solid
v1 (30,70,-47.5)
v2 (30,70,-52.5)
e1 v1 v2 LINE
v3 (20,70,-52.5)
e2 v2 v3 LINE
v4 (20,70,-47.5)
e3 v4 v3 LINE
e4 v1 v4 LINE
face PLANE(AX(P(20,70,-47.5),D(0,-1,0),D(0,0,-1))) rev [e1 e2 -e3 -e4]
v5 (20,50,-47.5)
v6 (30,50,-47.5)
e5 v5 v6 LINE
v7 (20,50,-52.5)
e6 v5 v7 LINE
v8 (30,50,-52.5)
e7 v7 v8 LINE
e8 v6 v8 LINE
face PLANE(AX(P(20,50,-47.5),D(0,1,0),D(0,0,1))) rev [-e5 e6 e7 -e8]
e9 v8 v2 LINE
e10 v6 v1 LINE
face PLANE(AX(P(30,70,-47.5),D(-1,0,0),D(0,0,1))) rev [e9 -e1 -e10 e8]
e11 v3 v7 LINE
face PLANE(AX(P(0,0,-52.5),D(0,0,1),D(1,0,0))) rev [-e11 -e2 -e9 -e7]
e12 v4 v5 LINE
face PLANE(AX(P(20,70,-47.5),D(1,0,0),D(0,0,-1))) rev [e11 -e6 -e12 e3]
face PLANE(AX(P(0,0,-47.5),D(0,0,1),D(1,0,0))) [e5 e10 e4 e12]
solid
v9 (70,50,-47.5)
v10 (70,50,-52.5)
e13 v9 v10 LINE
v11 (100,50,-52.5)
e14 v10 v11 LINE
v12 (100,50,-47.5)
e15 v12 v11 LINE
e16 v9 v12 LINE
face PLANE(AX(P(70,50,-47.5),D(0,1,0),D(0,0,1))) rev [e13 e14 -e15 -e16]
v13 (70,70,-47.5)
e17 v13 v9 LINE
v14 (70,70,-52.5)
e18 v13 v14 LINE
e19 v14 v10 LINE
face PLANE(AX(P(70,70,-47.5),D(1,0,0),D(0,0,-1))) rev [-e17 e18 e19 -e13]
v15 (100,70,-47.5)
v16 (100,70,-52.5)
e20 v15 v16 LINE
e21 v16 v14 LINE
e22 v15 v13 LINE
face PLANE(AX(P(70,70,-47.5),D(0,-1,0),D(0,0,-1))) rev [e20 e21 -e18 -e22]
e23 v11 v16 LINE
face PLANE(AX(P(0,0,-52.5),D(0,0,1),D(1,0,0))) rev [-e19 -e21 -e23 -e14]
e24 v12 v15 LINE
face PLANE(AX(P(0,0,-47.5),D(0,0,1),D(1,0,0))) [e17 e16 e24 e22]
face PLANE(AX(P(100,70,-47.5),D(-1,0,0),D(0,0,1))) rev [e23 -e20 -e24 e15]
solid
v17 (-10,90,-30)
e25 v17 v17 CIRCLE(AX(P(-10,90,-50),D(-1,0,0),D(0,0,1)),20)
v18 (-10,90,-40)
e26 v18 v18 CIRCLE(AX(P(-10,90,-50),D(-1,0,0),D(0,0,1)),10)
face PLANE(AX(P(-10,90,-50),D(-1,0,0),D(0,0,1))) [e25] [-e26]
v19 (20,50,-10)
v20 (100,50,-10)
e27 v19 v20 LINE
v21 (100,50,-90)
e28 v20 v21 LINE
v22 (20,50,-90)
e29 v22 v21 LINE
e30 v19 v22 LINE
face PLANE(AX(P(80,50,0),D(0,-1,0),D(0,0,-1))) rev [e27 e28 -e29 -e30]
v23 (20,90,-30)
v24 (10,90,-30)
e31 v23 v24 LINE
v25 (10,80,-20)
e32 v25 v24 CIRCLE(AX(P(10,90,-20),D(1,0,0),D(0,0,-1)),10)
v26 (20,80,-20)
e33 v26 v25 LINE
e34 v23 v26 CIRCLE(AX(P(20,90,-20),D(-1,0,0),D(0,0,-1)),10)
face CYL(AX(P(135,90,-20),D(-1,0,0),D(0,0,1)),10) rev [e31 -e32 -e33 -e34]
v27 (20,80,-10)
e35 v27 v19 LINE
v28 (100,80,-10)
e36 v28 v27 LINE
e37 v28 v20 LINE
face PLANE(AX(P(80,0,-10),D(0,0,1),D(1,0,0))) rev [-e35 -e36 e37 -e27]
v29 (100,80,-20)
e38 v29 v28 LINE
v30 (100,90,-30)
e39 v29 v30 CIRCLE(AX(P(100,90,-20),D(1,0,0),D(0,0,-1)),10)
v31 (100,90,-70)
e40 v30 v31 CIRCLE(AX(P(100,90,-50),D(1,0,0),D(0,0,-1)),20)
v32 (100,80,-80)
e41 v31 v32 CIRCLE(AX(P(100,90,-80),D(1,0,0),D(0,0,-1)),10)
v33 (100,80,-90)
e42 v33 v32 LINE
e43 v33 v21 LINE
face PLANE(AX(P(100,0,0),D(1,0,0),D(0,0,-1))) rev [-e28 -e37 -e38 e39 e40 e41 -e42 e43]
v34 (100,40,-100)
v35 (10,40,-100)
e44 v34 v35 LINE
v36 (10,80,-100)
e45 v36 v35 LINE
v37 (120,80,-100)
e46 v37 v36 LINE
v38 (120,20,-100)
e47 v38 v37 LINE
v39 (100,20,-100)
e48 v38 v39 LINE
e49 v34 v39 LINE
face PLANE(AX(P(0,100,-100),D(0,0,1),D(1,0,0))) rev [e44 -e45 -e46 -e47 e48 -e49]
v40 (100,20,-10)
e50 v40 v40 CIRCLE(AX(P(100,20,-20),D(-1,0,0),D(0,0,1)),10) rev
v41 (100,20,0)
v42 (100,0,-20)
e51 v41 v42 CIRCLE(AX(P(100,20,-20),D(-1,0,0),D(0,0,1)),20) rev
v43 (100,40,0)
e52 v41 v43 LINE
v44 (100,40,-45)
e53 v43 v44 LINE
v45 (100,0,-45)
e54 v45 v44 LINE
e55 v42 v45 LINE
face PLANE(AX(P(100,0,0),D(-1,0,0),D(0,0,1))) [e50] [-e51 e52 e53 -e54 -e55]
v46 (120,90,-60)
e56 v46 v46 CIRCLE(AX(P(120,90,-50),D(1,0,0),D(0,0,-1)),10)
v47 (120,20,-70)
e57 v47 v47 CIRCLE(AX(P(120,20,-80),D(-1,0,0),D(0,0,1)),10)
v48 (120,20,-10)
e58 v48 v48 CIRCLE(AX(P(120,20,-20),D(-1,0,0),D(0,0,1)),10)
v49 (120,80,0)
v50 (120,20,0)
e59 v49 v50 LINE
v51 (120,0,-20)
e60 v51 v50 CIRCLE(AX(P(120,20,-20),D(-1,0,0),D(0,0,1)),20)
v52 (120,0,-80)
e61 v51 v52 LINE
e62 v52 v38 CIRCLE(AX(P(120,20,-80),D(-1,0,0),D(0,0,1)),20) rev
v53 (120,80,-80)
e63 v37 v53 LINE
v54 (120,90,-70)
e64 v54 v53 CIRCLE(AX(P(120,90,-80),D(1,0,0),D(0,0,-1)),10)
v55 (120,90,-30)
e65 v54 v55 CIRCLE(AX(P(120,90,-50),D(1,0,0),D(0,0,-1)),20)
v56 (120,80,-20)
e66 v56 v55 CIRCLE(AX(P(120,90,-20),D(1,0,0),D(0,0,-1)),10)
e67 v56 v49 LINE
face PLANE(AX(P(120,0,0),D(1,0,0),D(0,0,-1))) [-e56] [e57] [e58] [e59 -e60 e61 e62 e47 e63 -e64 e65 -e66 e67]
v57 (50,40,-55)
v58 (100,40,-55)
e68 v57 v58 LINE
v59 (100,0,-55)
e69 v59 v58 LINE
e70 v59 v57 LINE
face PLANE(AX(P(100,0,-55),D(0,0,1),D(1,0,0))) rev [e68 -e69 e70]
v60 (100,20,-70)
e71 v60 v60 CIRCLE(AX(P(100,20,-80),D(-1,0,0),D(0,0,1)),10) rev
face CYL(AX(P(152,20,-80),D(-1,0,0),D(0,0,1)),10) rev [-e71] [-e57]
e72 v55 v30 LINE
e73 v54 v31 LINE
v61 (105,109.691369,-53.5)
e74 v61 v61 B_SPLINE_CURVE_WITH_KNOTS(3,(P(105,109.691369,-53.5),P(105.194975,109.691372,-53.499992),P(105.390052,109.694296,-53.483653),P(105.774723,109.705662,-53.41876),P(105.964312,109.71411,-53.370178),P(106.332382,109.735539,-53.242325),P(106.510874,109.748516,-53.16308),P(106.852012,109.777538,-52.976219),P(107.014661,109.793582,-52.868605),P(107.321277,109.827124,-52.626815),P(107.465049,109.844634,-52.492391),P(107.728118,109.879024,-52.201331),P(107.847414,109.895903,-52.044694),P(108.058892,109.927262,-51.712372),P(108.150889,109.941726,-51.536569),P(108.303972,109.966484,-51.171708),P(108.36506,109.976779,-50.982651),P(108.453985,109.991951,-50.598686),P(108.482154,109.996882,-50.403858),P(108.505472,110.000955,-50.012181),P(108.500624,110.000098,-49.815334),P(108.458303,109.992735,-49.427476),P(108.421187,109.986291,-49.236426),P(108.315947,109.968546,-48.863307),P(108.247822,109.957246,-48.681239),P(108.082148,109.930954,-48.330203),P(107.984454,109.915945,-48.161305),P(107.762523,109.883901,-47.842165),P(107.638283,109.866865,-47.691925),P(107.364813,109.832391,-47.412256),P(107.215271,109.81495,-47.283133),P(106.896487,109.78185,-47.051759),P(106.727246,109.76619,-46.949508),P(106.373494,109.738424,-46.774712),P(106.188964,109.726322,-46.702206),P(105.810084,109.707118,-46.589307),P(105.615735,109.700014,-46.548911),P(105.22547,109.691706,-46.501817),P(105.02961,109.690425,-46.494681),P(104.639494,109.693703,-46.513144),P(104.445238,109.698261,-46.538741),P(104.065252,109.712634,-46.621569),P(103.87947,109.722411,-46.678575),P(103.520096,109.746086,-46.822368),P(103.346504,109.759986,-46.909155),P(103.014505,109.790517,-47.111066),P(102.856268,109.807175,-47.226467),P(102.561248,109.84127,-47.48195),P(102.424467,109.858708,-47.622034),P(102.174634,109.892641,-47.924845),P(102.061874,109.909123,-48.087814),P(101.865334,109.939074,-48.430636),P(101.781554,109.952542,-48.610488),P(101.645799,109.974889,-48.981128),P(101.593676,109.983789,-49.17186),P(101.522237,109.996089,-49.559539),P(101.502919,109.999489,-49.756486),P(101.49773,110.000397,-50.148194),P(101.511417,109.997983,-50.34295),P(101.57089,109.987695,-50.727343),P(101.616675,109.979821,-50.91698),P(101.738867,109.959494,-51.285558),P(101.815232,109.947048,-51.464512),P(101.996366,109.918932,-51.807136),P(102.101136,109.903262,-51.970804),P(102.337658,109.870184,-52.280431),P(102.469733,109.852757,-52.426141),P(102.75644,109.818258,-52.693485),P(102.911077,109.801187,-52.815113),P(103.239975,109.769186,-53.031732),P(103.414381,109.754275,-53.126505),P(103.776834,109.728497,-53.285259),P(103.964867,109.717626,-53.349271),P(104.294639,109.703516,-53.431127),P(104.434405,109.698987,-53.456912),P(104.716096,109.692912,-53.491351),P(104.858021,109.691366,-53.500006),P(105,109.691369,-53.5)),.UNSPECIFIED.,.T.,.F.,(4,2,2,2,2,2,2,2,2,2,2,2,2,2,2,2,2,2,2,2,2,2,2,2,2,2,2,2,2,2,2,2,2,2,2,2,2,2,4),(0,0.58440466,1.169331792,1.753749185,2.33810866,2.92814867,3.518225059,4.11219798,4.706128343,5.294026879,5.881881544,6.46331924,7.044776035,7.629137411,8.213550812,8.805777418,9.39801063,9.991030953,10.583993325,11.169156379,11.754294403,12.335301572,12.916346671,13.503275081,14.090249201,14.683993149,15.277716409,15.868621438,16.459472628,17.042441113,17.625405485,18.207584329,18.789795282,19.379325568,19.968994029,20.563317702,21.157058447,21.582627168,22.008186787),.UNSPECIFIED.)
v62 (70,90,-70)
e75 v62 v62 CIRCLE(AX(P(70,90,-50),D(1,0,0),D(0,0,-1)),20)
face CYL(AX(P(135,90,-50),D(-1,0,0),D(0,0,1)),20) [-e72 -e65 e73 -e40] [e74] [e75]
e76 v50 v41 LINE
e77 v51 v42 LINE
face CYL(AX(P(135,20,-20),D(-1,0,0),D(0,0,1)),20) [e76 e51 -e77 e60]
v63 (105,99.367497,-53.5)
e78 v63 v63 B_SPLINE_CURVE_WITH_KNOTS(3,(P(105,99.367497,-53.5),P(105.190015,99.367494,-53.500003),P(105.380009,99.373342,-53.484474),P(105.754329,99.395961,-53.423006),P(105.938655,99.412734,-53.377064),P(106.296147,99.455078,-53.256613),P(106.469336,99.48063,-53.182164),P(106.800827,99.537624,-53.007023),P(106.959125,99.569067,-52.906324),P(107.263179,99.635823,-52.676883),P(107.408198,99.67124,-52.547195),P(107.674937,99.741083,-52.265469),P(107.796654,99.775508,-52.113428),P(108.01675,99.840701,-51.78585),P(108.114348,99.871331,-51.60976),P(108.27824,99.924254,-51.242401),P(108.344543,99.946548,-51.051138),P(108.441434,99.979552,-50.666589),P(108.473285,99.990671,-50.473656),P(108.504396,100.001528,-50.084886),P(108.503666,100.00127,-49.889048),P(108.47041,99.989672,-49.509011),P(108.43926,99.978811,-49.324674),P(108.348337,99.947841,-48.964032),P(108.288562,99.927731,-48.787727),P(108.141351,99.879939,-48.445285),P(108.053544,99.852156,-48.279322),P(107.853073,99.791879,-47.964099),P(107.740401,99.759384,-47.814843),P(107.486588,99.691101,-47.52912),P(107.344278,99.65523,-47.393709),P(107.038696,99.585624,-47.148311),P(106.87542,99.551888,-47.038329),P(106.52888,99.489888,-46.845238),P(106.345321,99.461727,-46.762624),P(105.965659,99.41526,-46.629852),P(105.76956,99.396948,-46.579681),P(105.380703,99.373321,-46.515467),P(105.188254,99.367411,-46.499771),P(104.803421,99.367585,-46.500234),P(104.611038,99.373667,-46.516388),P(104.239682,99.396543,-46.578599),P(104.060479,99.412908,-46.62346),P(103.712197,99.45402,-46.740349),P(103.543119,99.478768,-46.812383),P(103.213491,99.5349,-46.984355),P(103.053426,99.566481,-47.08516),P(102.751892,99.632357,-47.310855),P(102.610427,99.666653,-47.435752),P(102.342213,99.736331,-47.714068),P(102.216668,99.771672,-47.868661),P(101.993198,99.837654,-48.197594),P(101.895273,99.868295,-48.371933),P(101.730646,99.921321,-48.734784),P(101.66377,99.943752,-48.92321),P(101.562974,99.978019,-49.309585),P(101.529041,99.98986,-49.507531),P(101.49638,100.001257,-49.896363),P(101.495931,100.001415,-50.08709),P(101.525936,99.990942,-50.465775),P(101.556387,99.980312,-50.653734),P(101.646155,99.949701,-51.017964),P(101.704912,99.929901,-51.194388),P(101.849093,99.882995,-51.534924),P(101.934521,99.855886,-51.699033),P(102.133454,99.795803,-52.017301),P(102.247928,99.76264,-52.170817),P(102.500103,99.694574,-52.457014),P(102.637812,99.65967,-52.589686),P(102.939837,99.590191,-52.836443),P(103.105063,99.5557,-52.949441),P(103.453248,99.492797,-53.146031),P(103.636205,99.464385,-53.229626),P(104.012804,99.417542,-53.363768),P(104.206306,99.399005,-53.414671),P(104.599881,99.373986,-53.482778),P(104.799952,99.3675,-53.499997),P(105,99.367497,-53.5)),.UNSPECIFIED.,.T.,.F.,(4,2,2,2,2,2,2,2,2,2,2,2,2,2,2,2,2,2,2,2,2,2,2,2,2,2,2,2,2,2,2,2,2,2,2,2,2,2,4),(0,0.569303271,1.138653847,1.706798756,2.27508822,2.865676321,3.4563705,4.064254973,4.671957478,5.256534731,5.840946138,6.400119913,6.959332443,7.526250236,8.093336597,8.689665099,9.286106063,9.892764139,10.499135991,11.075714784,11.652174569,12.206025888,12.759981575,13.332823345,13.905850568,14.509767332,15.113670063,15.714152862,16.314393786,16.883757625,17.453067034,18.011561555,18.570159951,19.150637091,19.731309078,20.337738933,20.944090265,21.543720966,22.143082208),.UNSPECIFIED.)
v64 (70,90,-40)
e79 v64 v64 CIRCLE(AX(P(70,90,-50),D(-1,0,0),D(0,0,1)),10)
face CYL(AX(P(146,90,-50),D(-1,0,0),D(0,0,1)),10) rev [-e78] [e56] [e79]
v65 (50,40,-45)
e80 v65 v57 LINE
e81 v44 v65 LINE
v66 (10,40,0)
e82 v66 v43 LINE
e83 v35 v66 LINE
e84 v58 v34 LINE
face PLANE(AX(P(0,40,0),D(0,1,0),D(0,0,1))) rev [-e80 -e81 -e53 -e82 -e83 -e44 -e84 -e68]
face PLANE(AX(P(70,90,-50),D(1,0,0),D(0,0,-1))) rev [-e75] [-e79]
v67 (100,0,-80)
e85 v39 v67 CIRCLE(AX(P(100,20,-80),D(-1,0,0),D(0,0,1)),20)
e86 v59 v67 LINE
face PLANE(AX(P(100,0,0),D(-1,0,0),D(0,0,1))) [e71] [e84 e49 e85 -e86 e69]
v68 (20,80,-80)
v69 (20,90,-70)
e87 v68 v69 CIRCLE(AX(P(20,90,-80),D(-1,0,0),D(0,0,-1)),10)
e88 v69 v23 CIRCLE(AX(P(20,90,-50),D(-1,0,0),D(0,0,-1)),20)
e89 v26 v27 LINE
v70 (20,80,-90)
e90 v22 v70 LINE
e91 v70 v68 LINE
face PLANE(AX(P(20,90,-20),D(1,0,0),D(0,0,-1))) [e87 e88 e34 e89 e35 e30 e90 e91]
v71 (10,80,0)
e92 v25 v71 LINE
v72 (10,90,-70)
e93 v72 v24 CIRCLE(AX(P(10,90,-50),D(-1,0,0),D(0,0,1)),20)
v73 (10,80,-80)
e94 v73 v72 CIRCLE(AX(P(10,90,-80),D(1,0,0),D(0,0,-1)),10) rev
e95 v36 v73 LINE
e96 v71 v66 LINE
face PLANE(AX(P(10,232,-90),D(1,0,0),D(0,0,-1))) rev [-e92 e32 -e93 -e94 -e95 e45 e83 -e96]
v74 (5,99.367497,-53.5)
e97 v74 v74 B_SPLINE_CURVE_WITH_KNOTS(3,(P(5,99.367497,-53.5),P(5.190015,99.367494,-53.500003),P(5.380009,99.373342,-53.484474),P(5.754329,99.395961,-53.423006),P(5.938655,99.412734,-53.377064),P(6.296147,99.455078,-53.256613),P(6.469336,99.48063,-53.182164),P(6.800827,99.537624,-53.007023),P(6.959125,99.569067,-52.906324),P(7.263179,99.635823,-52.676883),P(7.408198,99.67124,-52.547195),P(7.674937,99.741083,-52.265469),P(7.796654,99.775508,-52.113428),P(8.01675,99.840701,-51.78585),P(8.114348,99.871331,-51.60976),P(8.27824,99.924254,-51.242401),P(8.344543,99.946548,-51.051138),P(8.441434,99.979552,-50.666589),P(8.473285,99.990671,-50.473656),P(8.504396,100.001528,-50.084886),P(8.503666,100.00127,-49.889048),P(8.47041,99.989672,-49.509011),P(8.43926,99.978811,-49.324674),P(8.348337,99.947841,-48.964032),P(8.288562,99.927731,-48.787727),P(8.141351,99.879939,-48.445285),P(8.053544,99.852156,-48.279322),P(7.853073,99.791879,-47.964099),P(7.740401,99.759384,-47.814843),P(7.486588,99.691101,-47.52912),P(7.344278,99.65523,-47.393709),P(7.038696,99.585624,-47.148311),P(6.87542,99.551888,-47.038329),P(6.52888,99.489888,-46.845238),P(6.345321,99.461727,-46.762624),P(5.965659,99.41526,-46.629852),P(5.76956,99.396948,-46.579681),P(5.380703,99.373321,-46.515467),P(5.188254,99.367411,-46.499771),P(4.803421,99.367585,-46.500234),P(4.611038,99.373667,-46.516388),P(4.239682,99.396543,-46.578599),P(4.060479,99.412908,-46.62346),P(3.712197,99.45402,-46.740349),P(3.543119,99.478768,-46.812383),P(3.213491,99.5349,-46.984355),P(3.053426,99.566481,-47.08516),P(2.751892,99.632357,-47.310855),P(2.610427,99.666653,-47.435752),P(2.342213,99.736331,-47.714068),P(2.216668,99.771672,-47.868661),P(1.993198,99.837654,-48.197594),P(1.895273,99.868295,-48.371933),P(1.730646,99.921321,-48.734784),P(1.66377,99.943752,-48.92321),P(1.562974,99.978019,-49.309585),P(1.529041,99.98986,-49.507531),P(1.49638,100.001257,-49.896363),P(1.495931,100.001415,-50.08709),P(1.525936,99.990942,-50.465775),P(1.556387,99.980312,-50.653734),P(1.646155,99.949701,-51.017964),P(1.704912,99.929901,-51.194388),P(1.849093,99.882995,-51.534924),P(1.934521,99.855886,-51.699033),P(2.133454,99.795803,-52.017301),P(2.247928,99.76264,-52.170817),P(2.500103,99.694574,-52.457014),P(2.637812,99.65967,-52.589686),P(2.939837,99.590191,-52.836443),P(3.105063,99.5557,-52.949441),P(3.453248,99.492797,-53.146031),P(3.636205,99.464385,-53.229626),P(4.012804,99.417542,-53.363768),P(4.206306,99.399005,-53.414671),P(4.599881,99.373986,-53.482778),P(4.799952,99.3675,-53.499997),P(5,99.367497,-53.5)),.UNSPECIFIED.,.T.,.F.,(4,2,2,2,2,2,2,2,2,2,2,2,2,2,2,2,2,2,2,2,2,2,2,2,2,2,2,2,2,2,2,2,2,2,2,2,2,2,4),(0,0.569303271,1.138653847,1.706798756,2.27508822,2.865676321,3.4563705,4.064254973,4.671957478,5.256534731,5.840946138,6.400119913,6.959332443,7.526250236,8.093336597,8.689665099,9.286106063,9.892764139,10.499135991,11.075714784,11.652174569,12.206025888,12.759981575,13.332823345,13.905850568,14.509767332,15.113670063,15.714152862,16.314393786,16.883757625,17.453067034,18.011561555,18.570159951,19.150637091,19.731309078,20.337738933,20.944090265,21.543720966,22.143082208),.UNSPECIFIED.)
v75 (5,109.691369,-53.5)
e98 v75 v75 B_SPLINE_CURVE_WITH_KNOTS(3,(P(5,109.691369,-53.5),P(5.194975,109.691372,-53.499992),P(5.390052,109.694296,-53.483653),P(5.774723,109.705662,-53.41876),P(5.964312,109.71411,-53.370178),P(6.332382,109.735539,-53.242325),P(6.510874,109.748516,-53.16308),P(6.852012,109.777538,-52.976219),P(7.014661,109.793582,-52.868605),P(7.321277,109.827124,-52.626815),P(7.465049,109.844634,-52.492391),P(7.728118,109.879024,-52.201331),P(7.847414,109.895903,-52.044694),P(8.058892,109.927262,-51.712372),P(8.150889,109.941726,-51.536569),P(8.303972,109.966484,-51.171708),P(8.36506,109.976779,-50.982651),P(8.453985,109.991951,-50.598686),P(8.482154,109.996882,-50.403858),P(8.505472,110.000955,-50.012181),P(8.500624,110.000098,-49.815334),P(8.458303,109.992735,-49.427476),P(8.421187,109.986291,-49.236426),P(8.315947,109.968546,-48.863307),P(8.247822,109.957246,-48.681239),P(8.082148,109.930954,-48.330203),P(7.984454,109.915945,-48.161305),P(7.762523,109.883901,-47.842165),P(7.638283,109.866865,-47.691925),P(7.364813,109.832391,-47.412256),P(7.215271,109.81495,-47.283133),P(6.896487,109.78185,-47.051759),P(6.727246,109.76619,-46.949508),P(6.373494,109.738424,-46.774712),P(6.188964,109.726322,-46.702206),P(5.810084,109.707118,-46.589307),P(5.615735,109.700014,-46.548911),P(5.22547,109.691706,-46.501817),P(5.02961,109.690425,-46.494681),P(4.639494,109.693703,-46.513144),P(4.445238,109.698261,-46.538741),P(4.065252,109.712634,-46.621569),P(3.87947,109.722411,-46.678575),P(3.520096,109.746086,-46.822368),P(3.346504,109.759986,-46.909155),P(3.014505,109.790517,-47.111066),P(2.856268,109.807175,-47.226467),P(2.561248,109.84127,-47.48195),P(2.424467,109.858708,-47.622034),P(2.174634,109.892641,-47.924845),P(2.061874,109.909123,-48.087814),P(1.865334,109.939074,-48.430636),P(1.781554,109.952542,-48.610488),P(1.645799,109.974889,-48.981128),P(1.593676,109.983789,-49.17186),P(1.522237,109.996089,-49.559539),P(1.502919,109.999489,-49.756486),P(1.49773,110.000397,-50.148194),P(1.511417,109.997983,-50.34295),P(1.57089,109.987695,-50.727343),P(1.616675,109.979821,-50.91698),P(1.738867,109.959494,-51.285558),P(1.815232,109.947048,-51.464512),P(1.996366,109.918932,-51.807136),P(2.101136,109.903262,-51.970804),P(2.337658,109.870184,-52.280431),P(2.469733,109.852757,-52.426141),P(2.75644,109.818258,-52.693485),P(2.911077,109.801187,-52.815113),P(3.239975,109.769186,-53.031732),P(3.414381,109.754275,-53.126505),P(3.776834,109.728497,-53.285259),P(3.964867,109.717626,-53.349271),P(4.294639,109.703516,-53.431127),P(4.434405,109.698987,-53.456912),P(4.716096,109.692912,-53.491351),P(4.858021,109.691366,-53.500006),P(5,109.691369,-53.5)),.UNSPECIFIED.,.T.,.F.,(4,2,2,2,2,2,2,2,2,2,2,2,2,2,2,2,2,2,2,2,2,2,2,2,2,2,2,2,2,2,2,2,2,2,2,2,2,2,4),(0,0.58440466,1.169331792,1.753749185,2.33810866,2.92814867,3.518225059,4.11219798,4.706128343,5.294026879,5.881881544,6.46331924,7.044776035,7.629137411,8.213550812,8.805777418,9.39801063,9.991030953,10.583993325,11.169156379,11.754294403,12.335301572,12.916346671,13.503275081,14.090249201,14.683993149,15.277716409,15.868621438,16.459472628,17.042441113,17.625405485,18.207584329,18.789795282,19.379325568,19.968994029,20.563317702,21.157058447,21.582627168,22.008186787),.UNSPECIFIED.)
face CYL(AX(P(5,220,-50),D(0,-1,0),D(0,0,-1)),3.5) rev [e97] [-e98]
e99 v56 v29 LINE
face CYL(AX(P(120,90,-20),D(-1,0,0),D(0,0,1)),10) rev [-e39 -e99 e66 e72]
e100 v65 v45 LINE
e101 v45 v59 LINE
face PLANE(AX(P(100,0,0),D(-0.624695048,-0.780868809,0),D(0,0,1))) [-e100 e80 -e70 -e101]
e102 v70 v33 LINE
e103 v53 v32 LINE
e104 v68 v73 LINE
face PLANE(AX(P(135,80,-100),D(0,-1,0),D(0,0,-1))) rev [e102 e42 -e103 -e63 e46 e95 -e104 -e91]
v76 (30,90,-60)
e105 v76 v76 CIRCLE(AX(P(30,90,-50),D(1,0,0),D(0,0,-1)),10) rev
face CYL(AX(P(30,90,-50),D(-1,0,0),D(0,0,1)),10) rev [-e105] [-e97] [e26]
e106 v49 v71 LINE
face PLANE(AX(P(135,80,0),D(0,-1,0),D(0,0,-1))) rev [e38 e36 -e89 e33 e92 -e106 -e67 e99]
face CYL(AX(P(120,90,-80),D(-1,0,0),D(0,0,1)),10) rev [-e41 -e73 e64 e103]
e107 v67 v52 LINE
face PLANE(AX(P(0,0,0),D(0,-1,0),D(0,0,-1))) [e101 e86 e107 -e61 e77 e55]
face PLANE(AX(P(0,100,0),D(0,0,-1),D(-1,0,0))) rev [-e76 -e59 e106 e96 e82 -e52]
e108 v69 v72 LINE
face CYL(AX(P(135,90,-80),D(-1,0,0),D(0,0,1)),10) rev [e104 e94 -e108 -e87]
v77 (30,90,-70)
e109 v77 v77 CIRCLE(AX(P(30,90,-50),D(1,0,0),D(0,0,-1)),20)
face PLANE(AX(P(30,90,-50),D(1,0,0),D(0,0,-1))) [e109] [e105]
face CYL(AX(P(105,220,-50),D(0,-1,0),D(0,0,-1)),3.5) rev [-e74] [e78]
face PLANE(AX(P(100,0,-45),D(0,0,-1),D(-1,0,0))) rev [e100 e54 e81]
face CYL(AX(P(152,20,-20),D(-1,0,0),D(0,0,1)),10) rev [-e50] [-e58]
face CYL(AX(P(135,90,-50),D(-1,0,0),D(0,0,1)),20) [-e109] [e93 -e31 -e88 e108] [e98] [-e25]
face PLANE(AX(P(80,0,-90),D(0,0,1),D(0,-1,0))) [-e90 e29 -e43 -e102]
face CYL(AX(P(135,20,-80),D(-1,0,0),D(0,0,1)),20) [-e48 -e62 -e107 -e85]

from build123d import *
from build123d.topology import SkipClean

# Parameters (mm, degrees)
SKETCH1_W                = 120
SKETCH1_H                = 100
BOSS_EXTRUDE1_DEPTH      = 100
CUT_EXTRUDE2_DEPTH       = 135
SKETCH3_W                = 20
SKETCH3_H                = 20
CUT_EXTRUDE3_DEPTH       = 135
CUT_EXTRUDE4_DEPTH       = 135
SKETCH5_R                = 20
BOSS_EXTRUDE2_DEPTH      = 120
BOSS_EXTRUDE3_START      = 10
SKETCH6_R                = 20
BOSS_EXTRUDE3_DEPTH      = 10
SKETCH7_R                = 10
CUT_EXTRUDE5_DEPTH       = 40
SKETCH8_R                = 20
CUT_EXTRUDE6_DEPTH       = 40
SKETCH9_R                = 10
CUT_EXTRUDE7_DEPTH       = 76
SKETCH10_R               = 3.5
CUT_EXTRUDE8_DEPTH       = 154
BOSS_EXTRUDE5_DEPTH      = 40
BOSS_EXTRUDE6_START      = -50.0000001
BOSS_EXTRUDE6_DEPTH      = 50.0000001
SKETCH13_R               = 3.5
BOSS_EXTRUDE7_DEPTH      = 50
SKETCH15_R               = 10
CUT_EXTRUDE11_DEPTH      = 152
CUT_EXTRUDE14_DEPTH      = 152
CUT_EXTRUDE14_DEPTH_BACK = 30
SKETCH16_OUTSIDE_W       = 171.496
SKETCH16_OUTSIDE_H       = 141.496
SKETCH16_OUTSIDE_W_2     = 90
SKETCH16_OUTSIDE_H_2     = 80
BOSS_EXTRUDE8_START      = 20
SKETCH17_R               = 20
SKETCH17_R_2             = 10
BOSS_EXTRUDE8_DEPTH      = 20
SKETCH18_R               = 20
SKETCH18_R_2             = 10
BOSS_EXTRUDE9_DEPTH      = 20
SKETCH19_W               = 10
SKETCH19_H               = 30
BOSS_EXTRUDE10_DEPTH     = 90
SKETCH20_W               = 90
SKETCH20_H               = 30
BOSS_EXTRUDE11_DEPTH     = 10
SKETCH22_W               = 100
SKETCH22_H               = 10
CUT_EXTRUDE15_DEPTH      = 10
SKETCH23_W               = 100
SKETCH23_H               = 10
CUT_EXTRUDE16_DEPTH      = 20
CUT_EXTRUDE19_START      = -20
CUT_EXTRUDE19_DEPTH      = 20
SKETCH25_R               = 3.5
CUT_EXTRUDE20_DEPTH      = 220
SKETCH26_R               = 3.5
BOSS_EXTRUDE15_DEPTH     = 85
CUT_EXTRUDE21_START      = 85
CUT_EXTRUDE21_DEPTH      = 85
CUT_EXTRUDE22_DEPTH      = 85
SKETCH30_W               = 90
SKETCH30_H               = 10
CUT_EXTRUDE23_DEPTH      = 85
CUT_EXTRUDE24_START      = -149
SKETCH31_R               = 10
CUT_EXTRUDE24_DEPTH      = 149
SKETCH34_W               = 10
SKETCH34_H               = 39.999
CUT_EXTRUDE33_DEPTH      = 30
SKETCH35_W               = 50
SKETCH35_H               = 10
CUT_EXTRUDE34_DEPTH      = 40
SKETCH36_W               = 112.854184332
SKETCH36_H               = 51.466709558
CUT_EXTRUDE35_DEPTH      = 100
CUT_EXTRUDE36_DEPTH      = 90
BOSS_EXTRUDE16_REACH     = 173.828
SKETCH38_W               = 20
SKETCH38_H               = 40
BOSS_EXTRUDE17_DEPTH     = 20
SKETCH40_W               = 50
SKETCH40_H               = 10
BOSS_EXTRUDE18_DEPTH     = 40
CHAMFER1_SIZE            = 50
CHAMFER1_SIZE_2          = 40
SKETCH41_W               = 10
SKETCH41_H               = 20
BOSS_EXTRUDE21_DEPTH     = 2.5
SKETCH41_W_2             = 30
BOSS_EXTRUDE21_2_DEPTH   = 2.5


with BuildPart() as part:
    # Sketch1 → Boss-Extrude1 (new body)
    with BuildSketch(Plane(origin=(0, 0, 0), x_dir=(1, 0, 0), z_dir=(0, 1, 0))):
        with Locations((60, 50)):
            Rectangle(SKETCH1_W, SKETCH1_H)
    extrude(amount=BOSS_EXTRUDE1_DEPTH)

    # Sketch2 → Cut-Extrude2 (cut)
    with BuildSketch(Plane(origin=(0, 0, 0), x_dir=(0, 0, -1), z_dir=(1, 0, 0))):
        with BuildLine():
            Line((80, 0), (100, 0))
            Line((100, 0), (100, 20))
            ThreePointArc((100, 20), (94.142135624, 5.857864376), (80, 0))
        make_face()
        with BuildLine():
            Line((0, 0), (20, 0))
            ThreePointArc((20, 0), (5.857864376, 5.857864376), (0, 20))
            Line((0, 20), (0, 0))
        make_face()
    extrude(amount=CUT_EXTRUDE2_DEPTH, mode=Mode.SUBTRACT)

    # Sketch3 → Cut-Extrude3 (cut)
    with BuildSketch(Plane.ZY):
        with Locations((-90, 90)):
            Rectangle(SKETCH3_W, SKETCH3_H)
        with Locations((-10, 90)):
            Rectangle(SKETCH3_W, SKETCH3_H)
    extrude(amount=-CUT_EXTRUDE3_DEPTH, mode=Mode.SUBTRACT)

    # Sketch4 → Cut-Extrude4 (cut)
    with BuildSketch(Plane.ZY):
        with BuildLine():
            Line((-80, 100), (-80, 80))
            ThreePointArc((-80, 80), (-72.928932188, 82.928932188), (-70, 90))
            ThreePointArc((-70, 90), (-69.318516526, 95.176380902), (-67.320508076, 100))
            Line((-67.320508076, 100), (-80, 100))
        make_face()
        with BuildLine():
            ThreePointArc((-32.679491924, 100), (-30.681483474, 95.176380902), (-30, 90))
            ThreePointArc((-30, 90), (-27.071067812, 82.928932188), (-20, 80))
            Line((-20, 80), (-20, 100))
            Line((-20, 100), (-32.679491924, 100))
        make_face()
    extrude(amount=-CUT_EXTRUDE4_DEPTH, mode=Mode.SUBTRACT)

    # Sketch5 → Boss-Extrude2 (add)
    with SkipClean():  # the faces are left unmerged after this step: merging them gives an invalid solid
        with BuildSketch(Plane.ZY):
            with Locations((-50, 90)):
                Circle(SKETCH5_R)
        extrude(amount=-BOSS_EXTRUDE2_DEPTH)

    # Sketch6 → Boss-Extrude3 (add)
    with SkipClean():  # the faces are left unmerged after this step: merging them gives an invalid solid
        with BuildSketch(Plane.ZY.offset(BOSS_EXTRUDE3_START)):
            with Locations((-50, 90)):
                Circle(SKETCH6_R)
        extrude(amount=-BOSS_EXTRUDE3_DEPTH)

    # Sketch7 → Cut-Extrude5 (cut)
    with SkipClean():  # the faces are left unmerged after this step: merging them gives an invalid solid
        with BuildSketch(Plane.ZY.offset(10)):
            with Locations((-50, 90)):
                Circle(SKETCH7_R)
        extrude(amount=-CUT_EXTRUDE5_DEPTH, mode=Mode.SUBTRACT)

    # Sketch8 → Cut-Extrude6 (cut)
    with SkipClean():  # the faces are left unmerged after this step: merging them gives an invalid solid
        with BuildSketch(Plane(origin=(30, 0, 0), x_dir=(0, 0, -1), z_dir=(1, 0, 0))):
            with Locations(Location((50, 90, 0), (0, 0, 180))):
                Circle(SKETCH8_R)
        extrude(amount=CUT_EXTRUDE6_DEPTH, mode=Mode.SUBTRACT)

    # Sketch9 → Cut-Extrude7 (cut)
    with SkipClean():  # the faces are left unmerged after this step: merging them gives an invalid solid
        with BuildSketch(Plane.ZY.offset(-70)):
            with Locations((-50, 90)):
                Circle(SKETCH9_R)
        extrude(amount=-CUT_EXTRUDE7_DEPTH, mode=Mode.SUBTRACT)

    # Sketch10 → Cut-Extrude8 (cut)
    with SkipClean():  # the faces are left unmerged after this step: merging them gives an invalid solid
        with BuildSketch(Plane(origin=(0, 0, 0), x_dir=(1, 0, 0), z_dir=(0, 1, 0))):
            with Locations(Location((5, 50, 0), (0, 0, 90))):
                Circle(SKETCH10_R)
            with Locations(Location((105, 50, 0), (0, 0, 90))):
                Circle(SKETCH10_R)
        extrude(amount=CUT_EXTRUDE8_DEPTH, mode=Mode.SUBTRACT)

    # Sketch11 → Boss-Extrude5 (add)
    with SkipClean():  # the faces are left unmerged after this step: merging them gives an invalid solid
        with BuildSketch(Plane.ZY.offset(10)):
            with BuildLine():
                ThreePointArc((-40, 90), (-50, 80), (-60, 90))
                Line((-60, 90), (-70, 90))
                ThreePointArc((-70, 90), (-50, 70), (-30, 90))
                Line((-30, 90), (-40, 90))
            make_face()
        extrude(amount=-BOSS_EXTRUDE5_DEPTH)
    add(part.part.scale(1), mode=Mode.REPLACE)  # the faces are merged on a copy

    # Boss-Extrude6: read off the stored shape, not the designer's step
    # Boss-Extrude6 outline → Boss-Extrude6 (add)
    with BuildSketch(Plane.ZY.offset(-70).offset(BOSS_EXTRUDE6_START)):
        with BuildLine():
            Line((-30, 90), (-40, 90))
            ThreePointArc((-40, 90), (-50, 80), (-60, 90))
            Line((-60, 90), (-70, 90))
            ThreePointArc((-70, 90), (-65.329710362, 77.154768192), (-53.500001979, 70.308631684))
            ThreePointArc((-53.500001979, 70.308631684), (-49.999509114, 70.000000006), (-46.499031404, 70.308803518))
            ThreePointArc((-46.499031404, 70.308803518), (-34.669974365, 77.155144452), (-30, 90))
        make_face()
    extrude(amount=BOSS_EXTRUDE6_DEPTH)

    # Sketch13 → Boss-Extrude7 (add)
    with SkipClean():  # the faces are left unmerged after this step: merging them gives an invalid solid
        with BuildSketch(Plane.XZ):
            with Locations(Location((5, -50, 0), (0, 0, 270))):
                Circle(SKETCH13_R)
            with Locations(Location((105, -50, 0), (0, 0, 270))):
                Circle(SKETCH13_R)
        extrude(amount=-BOSS_EXTRUDE7_DEPTH)

    # Sketch15 → Cut-Extrude11 (cut)
    with SkipClean():  # the faces are left unmerged after this step: merging them gives an invalid solid
        with BuildSketch(Plane.ZY):
            with Locations((-80, 20)):
                Circle(SKETCH15_R)
            with Locations((-20, 20)):
                Circle(SKETCH15_R)
        extrude(amount=-CUT_EXTRUDE11_DEPTH, mode=Mode.SUBTRACT)

    # Sketch16 outside → Cut-Extrude14 (cut, two sides: drawn at the far end of the back side and taken through both)
    with SkipClean():  # the faces are left unmerged after this step: merging them gives an invalid solid
        with BuildSketch(Plane(origin=(0, 80, 0), x_dir=(1, 0, 0), z_dir=(0, 1, 0)).offset(-CUT_EXTRUDE14_DEPTH_BACK)):
            with Locations((55, 50)):
                Rectangle(SKETCH16_OUTSIDE_W, SKETCH16_OUTSIDE_H)
            with Locations((55, 50)):
                Rectangle(SKETCH16_OUTSIDE_W_2, SKETCH16_OUTSIDE_H_2, mode=Mode.SUBTRACT)
        extrude(amount=CUT_EXTRUDE14_DEPTH + CUT_EXTRUDE14_DEPTH_BACK, mode=Mode.SUBTRACT)

    # Sketch17 → Boss-Extrude8 (add)
    with SkipClean():  # the faces are left unmerged after this step: merging them gives an invalid solid
        with BuildSketch(Plane.ZY.offset(-10).offset(BOSS_EXTRUDE8_START)):
            with Locations((-50, 90)):
                Circle(SKETCH17_R)
            with Locations((-50, 90)):
                Circle(SKETCH17_R_2, mode=Mode.SUBTRACT)
        extrude(amount=-BOSS_EXTRUDE8_DEPTH)

    # Sketch18 → Boss-Extrude9 (add)
    with SkipClean():  # the faces are left unmerged after this step: merging them gives an invalid solid
        with BuildSketch(Plane(origin=(100, 0, 0), x_dir=(0, 0, -1), z_dir=(1, 0, 0))):
            with Locations(Location((50, 90, 0), (0, 0, 180))):
                Circle(SKETCH18_R)
            with Locations(Location((50, 90, 0), (0, 0, 180))):
                Circle(SKETCH18_R_2, mode=Mode.SUBTRACT)
        extrude(amount=BOSS_EXTRUDE9_DEPTH)

    # Sketch19 → Boss-Extrude10 (add)
    with SkipClean():  # the faces are left unmerged after this step: merging them gives an invalid solid
        with BuildSketch(Plane.ZY.offset(-10)):
            with Locations((-95, 65)):
                Rectangle(SKETCH19_W, SKETCH19_H)
        extrude(amount=-BOSS_EXTRUDE10_DEPTH)

    # Sketch20 → Boss-Extrude11 (add)
    with SkipClean():  # the faces are left unmerged after this step: merging them gives an invalid solid
        with BuildSketch(Plane.XY.offset(-10)):
            with Locations((55, 65)):
                Rectangle(SKETCH20_W, SKETCH20_H)
        extrude(amount=BOSS_EXTRUDE11_DEPTH)

    # Sketch22 → Cut-Extrude15 (cut)
    with SkipClean():  # the faces are left unmerged after this step: merging them gives an invalid solid
        with BuildSketch(Plane.ZY):
            with Locations((-50, 45)):
                Rectangle(SKETCH22_W, SKETCH22_H)
        extrude(amount=-CUT_EXTRUDE15_DEPTH, mode=Mode.SUBTRACT)

    # Sketch23 → Cut-Extrude16 (cut)
    with SkipClean():  # the faces are left unmerged after this step: merging them gives an invalid solid
        with BuildSketch(Plane(origin=(120, 0, 0), x_dir=(0, 0, -1), z_dir=(1, 0, 0))):
            with Locations((50, 45)):
                Rectangle(SKETCH23_W, SKETCH23_H)
        extrude(amount=-CUT_EXTRUDE16_DEPTH, mode=Mode.SUBTRACT)

    # Sketch24 → Cut-Extrude19 (cut)
    with SkipClean():  # the faces are left unmerged after this step: merging them gives an invalid solid
        with BuildSketch(Plane(origin=(100, 0, 0), x_dir=(0, 0, -1), z_dir=(1, 0, 0)).offset(CUT_EXTRUDE19_START)):
            with BuildLine():
                ThreePointArc((30, 90), (27.071067812, 82.928932188), (20, 80))
                Line((20, 80), (32.679491924, 80))
                ThreePointArc((32.679491924, 80), (30.681483474, 84.823619098), (30, 90))
            make_face()
            with BuildLine():
                ThreePointArc((70, 90), (69.318516526, 84.823619098), (67.320508076, 80))
                Line((67.320508076, 80), (80, 80))
                ThreePointArc((80, 80), (72.928932188, 82.928932188), (70, 90))
            make_face()
            with BuildLine():
                Line((20, 80), (10, 80))
                Line((10, 80), (10, 50))
                Line((10, 50), (90, 50))
                Line((90, 50), (90, 80))
                Line((90, 80), (80, 80))
                Line((80, 80), (67.320508076, 80))
                ThreePointArc((67.320508076, 80), (50, 70), (32.679491924, 80))
                Line((32.679491924, 80), (20, 80))
            make_face()
        extrude(amount=CUT_EXTRUDE19_DEPTH, mode=Mode.SUBTRACT)

    # Sketch25 → Cut-Extrude20 (cut)
    with SkipClean():  # the faces are left unmerged after this step: merging them gives an invalid solid
        with BuildSketch(Plane(origin=(0, 0, 0), x_dir=(1, 0, 0), z_dir=(0, 1, 0))):
            with Locations(Location((5, 50, 0), (0, 0, 90))):
                Circle(SKETCH25_R)
            with Locations(Location((105, 50, 0), (0, 0, 90))):
                Circle(SKETCH25_R)
        extrude(amount=CUT_EXTRUDE20_DEPTH, mode=Mode.SUBTRACT)

    # Sketch26 → Boss-Extrude15 (add)
    with SkipClean():  # the faces are left unmerged after this step: merging them gives an invalid solid
        with BuildSketch(Plane.XZ):
            with Locations(Location((5, -50, 0), (0, 0, 270))):
                Circle(SKETCH26_R)
            with Locations(Location((105, -50, 0), (0, 0, 270))):
                Circle(SKETCH26_R)
        extrude(amount=-BOSS_EXTRUDE15_DEPTH)

    # Sketch27 → Cut-Extrude21 (cut)
    with SkipClean():  # the faces are left unmerged after this step: merging them gives an invalid solid
        with BuildSketch(Plane.ZY.offset(-10).offset(CUT_EXTRUDE21_START)):
            with BuildLine():
                Line((-70, 90), (-70, 39.958071387))
                Line((-70, 39.958071387), (-30, 40))
                Line((-30, 40), (-30, 90))
                ThreePointArc((-30, 90), (-50, 70), (-70, 90))
            make_face()
        extrude(amount=-CUT_EXTRUDE21_DEPTH, mode=Mode.SUBTRACT)
    add(part.part.scale(1), mode=Mode.REPLACE)  # the faces are merged on a copy

    # Sketch29 → Cut-Extrude22 (cut)
    with BuildSketch(Plane(origin=(80, 0, 0), x_dir=(0, 0, -1), z_dir=(1, 0, 0))):
        with BuildLine():
            Line((30, 90), (30, 50))
            Line((30, 50), (70, 50))
            Line((70, 50), (70, 90))
            ThreePointArc((70, 90), (50, 70), (30, 90))
        make_face()
    extrude(amount=CUT_EXTRUDE22_DEPTH, mode=Mode.SUBTRACT)

    # Sketch30 → Cut-Extrude23 (cut)
    with BuildSketch(Plane(origin=(100, 0, 0), x_dir=(0, 0, -1), z_dir=(1, 0, 0))):
        with Locations((55, 45)):
            Rectangle(SKETCH30_W, SKETCH30_H)
    extrude(amount=CUT_EXTRUDE23_DEPTH, mode=Mode.SUBTRACT)

    # Sketch31 → Cut-Extrude24 (cut)
    with BuildSketch(Plane(origin=(120, 0, 0), x_dir=(0, 0, -1), z_dir=(1, 0, 0)).offset(CUT_EXTRUDE24_START)):
        with Locations(Location((50, 90, 0), (0, 0, 180))):
            Circle(SKETCH31_R)
    extrude(amount=CUT_EXTRUDE24_DEPTH, mode=Mode.SUBTRACT)

    # Sketch34 → Cut-Extrude33 (cut)
    with BuildSketch(Plane.ZY):
        with Locations((-50, 19.9995)):
            Rectangle(SKETCH34_W, SKETCH34_H)
    extrude(amount=-CUT_EXTRUDE33_DEPTH, mode=Mode.SUBTRACT)

    # Sketch35 → Cut-Extrude34 (cut)
    with BuildSketch(Plane.XZ):
        with Locations((95, -50)):
            Rectangle(SKETCH35_W, SKETCH35_H)
    extrude(amount=-CUT_EXTRUDE34_DEPTH, mode=Mode.SUBTRACT)

    # Sketch36 → Cut-Extrude35 (cut)
    with BuildSketch(Plane.ZY):
        with Locations((-43.572907834, 14.266645221)):
            Rectangle(SKETCH36_W, SKETCH36_H)
    extrude(amount=-CUT_EXTRUDE35_DEPTH, mode=Mode.SUBTRACT)


with BuildPart() as cut_extrude35_piece_1:
    # of the separate pieces the step leaves, piece 1, a body of its own (cut_extrude35_pieces)
    add(part.part.solids().sort_by_distance((100, 80, 0))[0])

    # Sketch37 → Cut-Extrude36 (cut)
    with SkipClean():  # the faces are left unmerged after this step: merging them gives an invalid solid
        with BuildSketch(Plane(origin=(20, 0, 0), x_dir=(0, 0, -1), z_dir=(1, 0, 0))):
            with BuildLine():
                Line((90, 80), (80, 80))
                ThreePointArc((80, 80), (72.928932188, 82.928932188), (70, 90))
                ThreePointArc((70, 90), (50, 70), (30, 90))
                ThreePointArc((30, 90), (27.071067812, 82.928932188), (20, 80))
                Line((20, 80), (10, 80))
                Line((10, 80), (10, 50))
                Line((10, 50), (90, 50))
                Line((90, 50), (90, 80))
            make_face()
        extrude(amount=CUT_EXTRUDE36_DEPTH, mode=Mode.SUBTRACT)


with BuildPart() as cut_extrude35_piece_2:
    # of the separate pieces the step leaves, piece 2, a body of its own (cut_extrude35_pieces)
    add(part.part.solids().sort_by_distance((120, 40, -55))[0])

    # Sketch38 → Boss-Extrude16 (add, up to next)
    with BuildSketch(Plane(origin=(0, 0, -45), x_dir=(-1, 0, 0), z_dir=(0, 0, -1)), mode=Mode.PRIVATE) as boss_extrude16_sk1:
        with Locations((-110, 20)):
            Rectangle(SKETCH38_W, SKETCH38_H)
    boss_extrude16_tool1 = extrude(boss_extrude16_sk1.sketch, amount=BOSS_EXTRUDE16_REACH, mode=Mode.PRIVATE) - cut_extrude35_piece_2.part


with BuildPart() as cut_extrude35_piece_3:
    # of the separate pieces the step leaves, piece 3, a body of its own (cut_extrude35_pieces)
    add(part.part.solids().sort_by_distance((100, 20, 0))[0])


with BuildPart() as cut_extrude36_piece_1:
    # of the separate pieces the step leaves, piece 1, a body of its own (cut_extrude36_pieces)
    add(cut_extrude35_piece_1.part.solids().sort_by_distance((100, 40, 0))[0])


with BuildPart() as cut_extrude36_piece_2:
    # of the separate pieces the step leaves, piece 2, a body of its own (cut_extrude36_pieces)
    add(cut_extrude35_piece_1.part.solids().sort_by_distance((80, 90, -30))[0])


with BuildPart() as cut_extrude35_piece_2_1:
    add(cut_extrude35_piece_2.part)

    add(cut_extrude35_piece_3.part)  # Boss-Extrude16 merges Cut-Extrude35 piece 3
    add(boss_extrude16_tool1.solids().sort_by_distance((110, 20, -45))[0])


    with SkipClean():  # the faces are left unmerged after this step: merging them gives an invalid solid
        add(cut_extrude36_piece_1.part)  # Boss-Extrude17 merges Cut-Extrude36 piece 1

        add(cut_extrude36_piece_2.part)  # Boss-Extrude17 merges Cut-Extrude36 piece 2
        # Sketch39 → Boss-Extrude17 (add)
        with BuildSketch(Plane(origin=(100, 0, 0), x_dir=(0, 0, -1), z_dir=(1, 0, 0))):
            with BuildLine():
                ThreePointArc((30, 90), (27.071067812, 82.928932188), (20, 80))
                Line((20, 80), (10, 80))
                Line((10, 80), (10, 50))
                Line((10, 50), (90, 50))
                Line((90, 50), (90, 80))
                Line((90, 80), (80, 80))
                ThreePointArc((80, 80), (72.928932188, 82.928932188), (70, 90))
                ThreePointArc((70, 90), (50, 70), (30, 90))
            make_face()
            Polygon((90, 80), (90, 50), (10, 50), (10, 80), (0, 80), (0, 40), (100, 40), (100, 80), align=None)
        extrude(amount=BOSS_EXTRUDE17_DEPTH)

    # Sketch40 → Boss-Extrude18 (add)
    with SkipClean():  # the faces are left unmerged after this step: merging them gives an invalid solid
        with BuildSketch(Plane.XZ.offset(-40)):
            with Locations((75, -50)):
                Rectangle(SKETCH40_W, SKETCH40_H)
        extrude(amount=BOSS_EXTRUDE18_DEPTH)

    # Chamfer1
    # the kernel refuses this chamfer: 50, 40 mm, written as the material it takes off along each edge
    with BuildSketch(Plane(origin=(50, 0, 83.942180887), x_dir=(1, 0, 0), z_dir=(0, 0, -1))) as chamfer1_piece_1:
        Polygon((CHAMFER1_SIZE, 0), (0, -CHAMFER1_SIZE_2), (0, 0), align=None)
    extrude(amount=267.884361773, mode=Mode.SUBTRACT)


with BuildPart() as body_2:
    # Sketch41 → Boss-Extrude21 (new, symmetric)
    with BuildSketch(Plane.XY.offset(-50)):
        with Locations((25, 60)):
            Rectangle(SKETCH41_W, SKETCH41_H)
    extrude(amount=BOSS_EXTRUDE21_DEPTH, both=True)


with BuildPart() as body_3:
    # Sketch41 → Boss-Extrude21 2 (new, symmetric)
    with BuildSketch(Plane.XY.offset(-50)):
        with Locations((85, 60)):
            Rectangle(SKETCH41_W_2, SKETCH41_H)
    extrude(amount=BOSS_EXTRUDE21_2_DEPTH, both=True)


solid = Compound([cut_extrude35_piece_2_1.part, body_2.part, body_3.part])
